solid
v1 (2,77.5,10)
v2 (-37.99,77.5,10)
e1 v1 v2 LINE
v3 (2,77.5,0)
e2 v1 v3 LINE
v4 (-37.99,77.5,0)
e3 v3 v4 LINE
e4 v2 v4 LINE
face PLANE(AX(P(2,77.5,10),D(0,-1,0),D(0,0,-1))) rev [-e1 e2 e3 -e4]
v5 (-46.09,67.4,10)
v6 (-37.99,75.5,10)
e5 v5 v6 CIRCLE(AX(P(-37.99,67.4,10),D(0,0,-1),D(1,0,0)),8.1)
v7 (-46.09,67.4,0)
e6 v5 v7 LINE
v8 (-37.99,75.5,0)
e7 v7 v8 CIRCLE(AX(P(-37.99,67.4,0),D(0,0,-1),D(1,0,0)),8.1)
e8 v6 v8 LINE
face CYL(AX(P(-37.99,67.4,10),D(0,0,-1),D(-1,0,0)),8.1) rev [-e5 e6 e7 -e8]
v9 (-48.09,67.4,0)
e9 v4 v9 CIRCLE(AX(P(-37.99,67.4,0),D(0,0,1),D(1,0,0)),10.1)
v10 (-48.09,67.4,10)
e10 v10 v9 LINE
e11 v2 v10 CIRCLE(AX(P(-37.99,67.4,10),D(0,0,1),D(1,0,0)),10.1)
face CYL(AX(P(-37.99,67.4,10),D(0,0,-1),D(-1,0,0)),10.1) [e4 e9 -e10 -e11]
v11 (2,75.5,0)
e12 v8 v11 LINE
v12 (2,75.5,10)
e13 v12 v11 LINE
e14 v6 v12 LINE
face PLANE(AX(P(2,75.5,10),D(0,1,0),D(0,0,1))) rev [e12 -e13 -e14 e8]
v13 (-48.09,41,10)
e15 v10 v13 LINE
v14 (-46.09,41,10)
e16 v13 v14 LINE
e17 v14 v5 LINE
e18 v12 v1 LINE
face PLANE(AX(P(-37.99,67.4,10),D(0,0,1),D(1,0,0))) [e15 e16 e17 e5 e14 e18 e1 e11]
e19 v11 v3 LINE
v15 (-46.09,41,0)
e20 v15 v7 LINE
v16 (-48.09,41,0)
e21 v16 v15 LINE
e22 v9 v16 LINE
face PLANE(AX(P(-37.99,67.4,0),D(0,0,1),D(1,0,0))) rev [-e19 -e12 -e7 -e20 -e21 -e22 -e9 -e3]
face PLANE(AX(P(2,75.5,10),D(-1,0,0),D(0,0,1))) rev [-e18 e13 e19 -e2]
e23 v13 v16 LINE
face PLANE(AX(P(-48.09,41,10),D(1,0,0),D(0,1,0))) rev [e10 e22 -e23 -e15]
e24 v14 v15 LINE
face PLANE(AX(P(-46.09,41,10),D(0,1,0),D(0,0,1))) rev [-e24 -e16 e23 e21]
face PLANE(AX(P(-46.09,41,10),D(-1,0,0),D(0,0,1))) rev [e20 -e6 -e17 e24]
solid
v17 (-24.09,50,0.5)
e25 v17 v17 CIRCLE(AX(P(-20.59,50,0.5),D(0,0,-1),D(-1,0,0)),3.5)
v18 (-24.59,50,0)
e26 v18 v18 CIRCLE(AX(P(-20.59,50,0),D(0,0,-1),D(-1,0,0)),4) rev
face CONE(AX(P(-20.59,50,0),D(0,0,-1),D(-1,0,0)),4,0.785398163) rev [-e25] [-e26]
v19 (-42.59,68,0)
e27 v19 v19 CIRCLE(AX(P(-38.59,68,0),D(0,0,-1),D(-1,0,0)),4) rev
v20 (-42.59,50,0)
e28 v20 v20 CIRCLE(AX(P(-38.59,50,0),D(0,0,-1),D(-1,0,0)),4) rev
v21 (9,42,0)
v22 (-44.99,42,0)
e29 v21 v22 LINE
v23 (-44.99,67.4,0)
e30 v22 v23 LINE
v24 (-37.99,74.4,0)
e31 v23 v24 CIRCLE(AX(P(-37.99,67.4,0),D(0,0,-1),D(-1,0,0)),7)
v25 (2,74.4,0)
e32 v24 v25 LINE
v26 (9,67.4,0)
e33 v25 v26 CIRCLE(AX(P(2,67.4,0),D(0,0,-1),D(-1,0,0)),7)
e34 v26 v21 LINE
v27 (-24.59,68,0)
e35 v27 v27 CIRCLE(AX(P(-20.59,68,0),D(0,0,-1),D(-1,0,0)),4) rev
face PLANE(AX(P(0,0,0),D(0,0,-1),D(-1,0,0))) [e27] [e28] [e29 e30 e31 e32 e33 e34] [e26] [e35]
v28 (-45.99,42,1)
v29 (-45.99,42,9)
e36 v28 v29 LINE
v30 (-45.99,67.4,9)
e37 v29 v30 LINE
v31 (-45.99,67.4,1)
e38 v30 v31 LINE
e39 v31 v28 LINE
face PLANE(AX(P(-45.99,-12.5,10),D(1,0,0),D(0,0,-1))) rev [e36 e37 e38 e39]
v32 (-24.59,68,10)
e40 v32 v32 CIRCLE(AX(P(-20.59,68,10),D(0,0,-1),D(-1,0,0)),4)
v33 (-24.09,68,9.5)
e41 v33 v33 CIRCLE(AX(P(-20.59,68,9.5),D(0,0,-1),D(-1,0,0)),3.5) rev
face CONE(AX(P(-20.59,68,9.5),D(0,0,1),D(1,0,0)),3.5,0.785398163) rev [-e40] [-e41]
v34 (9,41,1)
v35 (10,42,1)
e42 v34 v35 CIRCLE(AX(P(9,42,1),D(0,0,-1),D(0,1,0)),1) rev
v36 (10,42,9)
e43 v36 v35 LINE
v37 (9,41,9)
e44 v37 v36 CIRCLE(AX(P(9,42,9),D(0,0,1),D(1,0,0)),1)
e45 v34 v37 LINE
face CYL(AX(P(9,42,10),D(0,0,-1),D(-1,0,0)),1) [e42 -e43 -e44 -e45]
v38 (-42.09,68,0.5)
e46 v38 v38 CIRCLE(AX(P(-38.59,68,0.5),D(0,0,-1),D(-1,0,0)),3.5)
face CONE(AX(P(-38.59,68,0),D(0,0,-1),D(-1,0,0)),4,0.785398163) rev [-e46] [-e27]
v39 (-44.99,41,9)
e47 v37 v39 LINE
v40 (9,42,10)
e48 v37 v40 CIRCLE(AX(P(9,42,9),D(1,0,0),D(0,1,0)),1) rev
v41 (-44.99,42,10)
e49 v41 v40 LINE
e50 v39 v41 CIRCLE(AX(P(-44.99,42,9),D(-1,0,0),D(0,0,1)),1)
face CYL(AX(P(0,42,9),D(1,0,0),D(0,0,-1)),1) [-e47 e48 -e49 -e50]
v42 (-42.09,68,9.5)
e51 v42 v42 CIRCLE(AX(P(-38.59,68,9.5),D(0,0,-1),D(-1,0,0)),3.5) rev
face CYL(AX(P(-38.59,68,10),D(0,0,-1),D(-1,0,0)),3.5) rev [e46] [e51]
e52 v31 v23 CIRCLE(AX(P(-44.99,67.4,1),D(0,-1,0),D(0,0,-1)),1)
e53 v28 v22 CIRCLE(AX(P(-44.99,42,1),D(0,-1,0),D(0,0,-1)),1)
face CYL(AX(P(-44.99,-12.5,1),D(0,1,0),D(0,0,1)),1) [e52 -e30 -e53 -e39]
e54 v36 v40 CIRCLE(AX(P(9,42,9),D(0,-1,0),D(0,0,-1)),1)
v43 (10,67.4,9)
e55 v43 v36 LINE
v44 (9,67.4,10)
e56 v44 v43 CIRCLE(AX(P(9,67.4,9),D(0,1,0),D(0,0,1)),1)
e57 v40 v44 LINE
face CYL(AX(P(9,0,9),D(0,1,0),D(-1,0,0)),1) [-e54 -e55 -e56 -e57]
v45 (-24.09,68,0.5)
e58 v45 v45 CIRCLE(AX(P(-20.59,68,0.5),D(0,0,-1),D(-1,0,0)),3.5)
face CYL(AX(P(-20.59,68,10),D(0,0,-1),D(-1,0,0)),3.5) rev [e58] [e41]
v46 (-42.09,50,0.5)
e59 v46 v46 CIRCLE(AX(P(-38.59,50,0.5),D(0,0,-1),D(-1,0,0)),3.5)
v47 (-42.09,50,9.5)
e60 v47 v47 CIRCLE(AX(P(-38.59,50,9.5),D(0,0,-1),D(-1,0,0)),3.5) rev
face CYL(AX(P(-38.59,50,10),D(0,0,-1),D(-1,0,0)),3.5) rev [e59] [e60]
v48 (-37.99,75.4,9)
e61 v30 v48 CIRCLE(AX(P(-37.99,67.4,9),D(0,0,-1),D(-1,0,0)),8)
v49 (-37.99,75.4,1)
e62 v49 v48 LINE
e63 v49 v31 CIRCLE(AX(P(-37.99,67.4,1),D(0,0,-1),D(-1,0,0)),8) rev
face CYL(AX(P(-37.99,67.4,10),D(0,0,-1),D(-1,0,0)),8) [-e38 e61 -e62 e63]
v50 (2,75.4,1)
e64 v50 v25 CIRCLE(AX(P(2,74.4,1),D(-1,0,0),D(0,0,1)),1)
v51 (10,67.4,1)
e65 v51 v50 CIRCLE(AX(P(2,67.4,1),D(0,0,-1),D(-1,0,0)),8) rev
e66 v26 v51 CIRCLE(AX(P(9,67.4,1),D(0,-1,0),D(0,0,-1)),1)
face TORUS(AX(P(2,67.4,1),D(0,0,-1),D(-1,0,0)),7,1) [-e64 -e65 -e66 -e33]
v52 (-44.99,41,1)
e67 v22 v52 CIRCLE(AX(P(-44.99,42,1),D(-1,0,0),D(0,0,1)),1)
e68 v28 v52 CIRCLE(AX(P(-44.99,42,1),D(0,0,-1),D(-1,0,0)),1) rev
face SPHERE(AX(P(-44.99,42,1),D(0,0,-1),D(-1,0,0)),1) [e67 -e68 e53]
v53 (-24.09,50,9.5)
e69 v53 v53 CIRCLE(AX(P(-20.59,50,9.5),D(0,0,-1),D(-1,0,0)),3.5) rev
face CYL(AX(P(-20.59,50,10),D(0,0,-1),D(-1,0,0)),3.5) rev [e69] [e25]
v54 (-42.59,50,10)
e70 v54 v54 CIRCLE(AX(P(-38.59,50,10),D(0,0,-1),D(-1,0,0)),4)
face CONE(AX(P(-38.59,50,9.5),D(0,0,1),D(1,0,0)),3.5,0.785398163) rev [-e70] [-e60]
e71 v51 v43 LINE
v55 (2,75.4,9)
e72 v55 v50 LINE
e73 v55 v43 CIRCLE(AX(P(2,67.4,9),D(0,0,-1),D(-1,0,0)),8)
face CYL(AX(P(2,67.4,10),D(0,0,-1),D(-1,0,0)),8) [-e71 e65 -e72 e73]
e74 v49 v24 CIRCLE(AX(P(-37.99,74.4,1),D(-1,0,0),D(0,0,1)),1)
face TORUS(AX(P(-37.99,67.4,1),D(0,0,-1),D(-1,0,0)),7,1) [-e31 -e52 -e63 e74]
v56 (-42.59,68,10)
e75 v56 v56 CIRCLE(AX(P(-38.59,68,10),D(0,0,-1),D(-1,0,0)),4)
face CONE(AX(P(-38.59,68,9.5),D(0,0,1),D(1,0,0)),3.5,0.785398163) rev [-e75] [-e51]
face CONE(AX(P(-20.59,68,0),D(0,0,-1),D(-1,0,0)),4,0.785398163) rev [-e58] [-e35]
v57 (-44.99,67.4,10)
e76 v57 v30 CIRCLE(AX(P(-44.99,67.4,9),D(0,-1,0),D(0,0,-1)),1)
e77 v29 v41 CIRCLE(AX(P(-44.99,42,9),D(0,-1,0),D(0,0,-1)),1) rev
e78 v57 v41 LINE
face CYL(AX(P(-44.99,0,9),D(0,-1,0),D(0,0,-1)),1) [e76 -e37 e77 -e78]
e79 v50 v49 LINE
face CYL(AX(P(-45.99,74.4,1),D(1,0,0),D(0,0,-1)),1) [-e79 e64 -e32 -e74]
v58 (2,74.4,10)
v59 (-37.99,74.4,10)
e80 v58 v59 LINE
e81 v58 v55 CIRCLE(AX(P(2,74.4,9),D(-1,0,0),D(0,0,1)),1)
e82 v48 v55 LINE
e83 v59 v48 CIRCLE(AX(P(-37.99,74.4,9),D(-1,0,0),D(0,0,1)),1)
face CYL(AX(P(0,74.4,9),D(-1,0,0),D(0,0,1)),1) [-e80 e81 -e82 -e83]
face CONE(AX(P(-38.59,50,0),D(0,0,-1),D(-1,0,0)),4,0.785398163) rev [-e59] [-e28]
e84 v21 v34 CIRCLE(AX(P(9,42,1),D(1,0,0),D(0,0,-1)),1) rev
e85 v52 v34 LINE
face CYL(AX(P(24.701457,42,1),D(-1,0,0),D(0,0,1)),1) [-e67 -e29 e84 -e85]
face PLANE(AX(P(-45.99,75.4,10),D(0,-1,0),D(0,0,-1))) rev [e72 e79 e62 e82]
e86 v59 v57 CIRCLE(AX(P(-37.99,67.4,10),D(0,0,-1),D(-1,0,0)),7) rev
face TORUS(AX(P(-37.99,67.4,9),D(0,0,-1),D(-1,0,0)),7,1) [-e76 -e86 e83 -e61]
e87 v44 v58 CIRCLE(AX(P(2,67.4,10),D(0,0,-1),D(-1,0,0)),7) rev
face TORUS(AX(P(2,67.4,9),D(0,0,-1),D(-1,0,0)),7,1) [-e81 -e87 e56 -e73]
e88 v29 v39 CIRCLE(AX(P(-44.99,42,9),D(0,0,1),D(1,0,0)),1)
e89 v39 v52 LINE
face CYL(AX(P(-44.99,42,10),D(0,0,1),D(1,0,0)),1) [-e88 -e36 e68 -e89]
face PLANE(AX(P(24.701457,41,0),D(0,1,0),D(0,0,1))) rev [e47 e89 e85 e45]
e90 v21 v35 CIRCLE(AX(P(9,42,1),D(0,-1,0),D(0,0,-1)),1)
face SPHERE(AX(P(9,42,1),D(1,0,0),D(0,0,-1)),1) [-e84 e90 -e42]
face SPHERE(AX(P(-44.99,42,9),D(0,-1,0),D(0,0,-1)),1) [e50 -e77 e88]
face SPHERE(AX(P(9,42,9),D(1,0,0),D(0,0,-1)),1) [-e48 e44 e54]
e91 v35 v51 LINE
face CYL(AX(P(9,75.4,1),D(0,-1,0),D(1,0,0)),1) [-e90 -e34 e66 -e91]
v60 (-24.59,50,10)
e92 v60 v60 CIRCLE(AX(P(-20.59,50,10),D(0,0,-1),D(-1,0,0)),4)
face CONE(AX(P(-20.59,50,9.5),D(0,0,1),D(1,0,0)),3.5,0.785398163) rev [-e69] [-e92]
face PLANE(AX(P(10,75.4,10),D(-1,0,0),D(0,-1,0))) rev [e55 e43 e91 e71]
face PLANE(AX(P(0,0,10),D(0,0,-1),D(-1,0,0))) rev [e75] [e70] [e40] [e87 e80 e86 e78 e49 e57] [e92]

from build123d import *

# Parameters (mm, degrees)
SKETCH1_W           = 55.99
SKETCH1_H           = 87.9
SKETCH1_R           = 3.5
BOSS_EXTRUDE1_DEPTH = 10
FILLET1_R           = 8
FILLET2_R           = 1
CHAMFER1_SIZE       = 0.5
BOSS_EXTRUDE2_DEPTH = 10


# Read off the part's stored shape, not the designer's step: Split1
with BuildPart() as part:
    # Sketch1 → Boss-Extrude1 (new body)
    with BuildSketch(Plane.XY):
        with Locations((-17.995, 31.45)):
            Rectangle(SKETCH1_W, SKETCH1_H)
        Circle(SKETCH1_R, mode=Mode.SUBTRACT)
        with Locations((-6.59, 32)):
            Circle(SKETCH1_R, mode=Mode.SUBTRACT)
        with Locations((-20.59, 32)):
            Circle(SKETCH1_R, mode=Mode.SUBTRACT)
        with Locations((-14, 0)):
            Circle(SKETCH1_R, mode=Mode.SUBTRACT)
        with Locations((-20.59, 50)):
            Circle(SKETCH1_R, mode=Mode.SUBTRACT)
        with Locations((-20.59, 68)):
            Circle(SKETCH1_R, mode=Mode.SUBTRACT)
        with Locations((-38.59, 68)):
            Circle(SKETCH1_R, mode=Mode.SUBTRACT)
        with Locations((-38.59, 50)):
            Circle(SKETCH1_R, mode=Mode.SUBTRACT)
    extrude(amount=BOSS_EXTRUDE1_DEPTH)

    # Fillet1
    fillet1_edges = [part.edges().sort_by_distance(p)[0] for p in [
        (-45.99, -12.5, 5),
        (-45.99, 75.4, 5),
        (10, 75.4, 5),
        (10, -12.5, 5),
    ]]
    fillet(fillet1_edges, radius=FILLET1_R)


with BuildPart() as body_2:
    # Split1: the piece on the far side of the plane
    add(part.part)
    split(bisect_by=Plane(origin=(0, 41, 0), x_dir=(1, 0, 0), z_dir=(0, 1, 0)), keep=Keep.BOTTOM)


with BuildPart() as part_1:
    add(part.part)

    # Split1
    split(bisect_by=Plane(origin=(0, 41, 0), x_dir=(1, 0, 0), z_dir=(0, 1, 0)), keep=Keep.TOP)

    # Fillet2
    fillet2_edges = [part_1.edges().sort_by_distance(p)[0] for p in [
        (-17.995, 41, 0),
        (-45.99, 54.2, 0),
        (-17.995, 75.4, 0),
        (7.656854249, 73.056854249, 0),
        (-43.646854249, 73.056854249, 0),
        (-17.995, 75.4, 10),
        (-45.99, 54.2, 10),
        (7.656854249, 73.056854249, 10),
        (-43.646854249, 73.056854249, 10),
        (-45.99, 41, 5),
        (10, 54.2, 10),
        (10, 54.2, 0),
        (10, 41, 5),
        (-17.995, 41, 10),
    ]]
    fillet(fillet2_edges, radius=FILLET2_R)

    # Chamfer1
    chamfer1_edges = [part_1.edges().sort_by_distance(p)[0] for p in [
        (-24.09, 50, 0),
        (-24.09, 50, 10),
        (-24.09, 68, 0),
        (-24.09, 68, 10),
        (-42.09, 68, 0),
        (-42.09, 68, 10),
        (-42.09, 50, 0),
        (-42.09, 50, 10),
    ]]
    chamfer(chamfer1_edges, length=CHAMFER1_SIZE)


with BuildPart() as body_2_2:
    # Sketch4 → Boss-Extrude2 (new body)
    with BuildSketch(Plane.XY):
        with BuildLine():
            Line((2, 77.5), (-37.99, 77.5))
            ThreePointArc((-37.99, 77.5), (-45.13177849, 74.54177849), (-48.09, 67.4))
            Line((-48.09, 67.4), (-48.09, 41))
            Line((-48.09, 41), (-46.09, 41))
            Line((-46.09, 41), (-46.09, 67.4))
            ThreePointArc((-46.09, 67.4), (-43.717564928, 73.127564928), (-37.99, 75.5))
            Line((-37.99, 75.5), (2, 75.5))
            Line((2, 75.5), (2, 77.5))
        make_face()
    extrude(amount=BOSS_EXTRUDE2_DEPTH)


solid = Compound([part_1.part, body_2_2.part])
